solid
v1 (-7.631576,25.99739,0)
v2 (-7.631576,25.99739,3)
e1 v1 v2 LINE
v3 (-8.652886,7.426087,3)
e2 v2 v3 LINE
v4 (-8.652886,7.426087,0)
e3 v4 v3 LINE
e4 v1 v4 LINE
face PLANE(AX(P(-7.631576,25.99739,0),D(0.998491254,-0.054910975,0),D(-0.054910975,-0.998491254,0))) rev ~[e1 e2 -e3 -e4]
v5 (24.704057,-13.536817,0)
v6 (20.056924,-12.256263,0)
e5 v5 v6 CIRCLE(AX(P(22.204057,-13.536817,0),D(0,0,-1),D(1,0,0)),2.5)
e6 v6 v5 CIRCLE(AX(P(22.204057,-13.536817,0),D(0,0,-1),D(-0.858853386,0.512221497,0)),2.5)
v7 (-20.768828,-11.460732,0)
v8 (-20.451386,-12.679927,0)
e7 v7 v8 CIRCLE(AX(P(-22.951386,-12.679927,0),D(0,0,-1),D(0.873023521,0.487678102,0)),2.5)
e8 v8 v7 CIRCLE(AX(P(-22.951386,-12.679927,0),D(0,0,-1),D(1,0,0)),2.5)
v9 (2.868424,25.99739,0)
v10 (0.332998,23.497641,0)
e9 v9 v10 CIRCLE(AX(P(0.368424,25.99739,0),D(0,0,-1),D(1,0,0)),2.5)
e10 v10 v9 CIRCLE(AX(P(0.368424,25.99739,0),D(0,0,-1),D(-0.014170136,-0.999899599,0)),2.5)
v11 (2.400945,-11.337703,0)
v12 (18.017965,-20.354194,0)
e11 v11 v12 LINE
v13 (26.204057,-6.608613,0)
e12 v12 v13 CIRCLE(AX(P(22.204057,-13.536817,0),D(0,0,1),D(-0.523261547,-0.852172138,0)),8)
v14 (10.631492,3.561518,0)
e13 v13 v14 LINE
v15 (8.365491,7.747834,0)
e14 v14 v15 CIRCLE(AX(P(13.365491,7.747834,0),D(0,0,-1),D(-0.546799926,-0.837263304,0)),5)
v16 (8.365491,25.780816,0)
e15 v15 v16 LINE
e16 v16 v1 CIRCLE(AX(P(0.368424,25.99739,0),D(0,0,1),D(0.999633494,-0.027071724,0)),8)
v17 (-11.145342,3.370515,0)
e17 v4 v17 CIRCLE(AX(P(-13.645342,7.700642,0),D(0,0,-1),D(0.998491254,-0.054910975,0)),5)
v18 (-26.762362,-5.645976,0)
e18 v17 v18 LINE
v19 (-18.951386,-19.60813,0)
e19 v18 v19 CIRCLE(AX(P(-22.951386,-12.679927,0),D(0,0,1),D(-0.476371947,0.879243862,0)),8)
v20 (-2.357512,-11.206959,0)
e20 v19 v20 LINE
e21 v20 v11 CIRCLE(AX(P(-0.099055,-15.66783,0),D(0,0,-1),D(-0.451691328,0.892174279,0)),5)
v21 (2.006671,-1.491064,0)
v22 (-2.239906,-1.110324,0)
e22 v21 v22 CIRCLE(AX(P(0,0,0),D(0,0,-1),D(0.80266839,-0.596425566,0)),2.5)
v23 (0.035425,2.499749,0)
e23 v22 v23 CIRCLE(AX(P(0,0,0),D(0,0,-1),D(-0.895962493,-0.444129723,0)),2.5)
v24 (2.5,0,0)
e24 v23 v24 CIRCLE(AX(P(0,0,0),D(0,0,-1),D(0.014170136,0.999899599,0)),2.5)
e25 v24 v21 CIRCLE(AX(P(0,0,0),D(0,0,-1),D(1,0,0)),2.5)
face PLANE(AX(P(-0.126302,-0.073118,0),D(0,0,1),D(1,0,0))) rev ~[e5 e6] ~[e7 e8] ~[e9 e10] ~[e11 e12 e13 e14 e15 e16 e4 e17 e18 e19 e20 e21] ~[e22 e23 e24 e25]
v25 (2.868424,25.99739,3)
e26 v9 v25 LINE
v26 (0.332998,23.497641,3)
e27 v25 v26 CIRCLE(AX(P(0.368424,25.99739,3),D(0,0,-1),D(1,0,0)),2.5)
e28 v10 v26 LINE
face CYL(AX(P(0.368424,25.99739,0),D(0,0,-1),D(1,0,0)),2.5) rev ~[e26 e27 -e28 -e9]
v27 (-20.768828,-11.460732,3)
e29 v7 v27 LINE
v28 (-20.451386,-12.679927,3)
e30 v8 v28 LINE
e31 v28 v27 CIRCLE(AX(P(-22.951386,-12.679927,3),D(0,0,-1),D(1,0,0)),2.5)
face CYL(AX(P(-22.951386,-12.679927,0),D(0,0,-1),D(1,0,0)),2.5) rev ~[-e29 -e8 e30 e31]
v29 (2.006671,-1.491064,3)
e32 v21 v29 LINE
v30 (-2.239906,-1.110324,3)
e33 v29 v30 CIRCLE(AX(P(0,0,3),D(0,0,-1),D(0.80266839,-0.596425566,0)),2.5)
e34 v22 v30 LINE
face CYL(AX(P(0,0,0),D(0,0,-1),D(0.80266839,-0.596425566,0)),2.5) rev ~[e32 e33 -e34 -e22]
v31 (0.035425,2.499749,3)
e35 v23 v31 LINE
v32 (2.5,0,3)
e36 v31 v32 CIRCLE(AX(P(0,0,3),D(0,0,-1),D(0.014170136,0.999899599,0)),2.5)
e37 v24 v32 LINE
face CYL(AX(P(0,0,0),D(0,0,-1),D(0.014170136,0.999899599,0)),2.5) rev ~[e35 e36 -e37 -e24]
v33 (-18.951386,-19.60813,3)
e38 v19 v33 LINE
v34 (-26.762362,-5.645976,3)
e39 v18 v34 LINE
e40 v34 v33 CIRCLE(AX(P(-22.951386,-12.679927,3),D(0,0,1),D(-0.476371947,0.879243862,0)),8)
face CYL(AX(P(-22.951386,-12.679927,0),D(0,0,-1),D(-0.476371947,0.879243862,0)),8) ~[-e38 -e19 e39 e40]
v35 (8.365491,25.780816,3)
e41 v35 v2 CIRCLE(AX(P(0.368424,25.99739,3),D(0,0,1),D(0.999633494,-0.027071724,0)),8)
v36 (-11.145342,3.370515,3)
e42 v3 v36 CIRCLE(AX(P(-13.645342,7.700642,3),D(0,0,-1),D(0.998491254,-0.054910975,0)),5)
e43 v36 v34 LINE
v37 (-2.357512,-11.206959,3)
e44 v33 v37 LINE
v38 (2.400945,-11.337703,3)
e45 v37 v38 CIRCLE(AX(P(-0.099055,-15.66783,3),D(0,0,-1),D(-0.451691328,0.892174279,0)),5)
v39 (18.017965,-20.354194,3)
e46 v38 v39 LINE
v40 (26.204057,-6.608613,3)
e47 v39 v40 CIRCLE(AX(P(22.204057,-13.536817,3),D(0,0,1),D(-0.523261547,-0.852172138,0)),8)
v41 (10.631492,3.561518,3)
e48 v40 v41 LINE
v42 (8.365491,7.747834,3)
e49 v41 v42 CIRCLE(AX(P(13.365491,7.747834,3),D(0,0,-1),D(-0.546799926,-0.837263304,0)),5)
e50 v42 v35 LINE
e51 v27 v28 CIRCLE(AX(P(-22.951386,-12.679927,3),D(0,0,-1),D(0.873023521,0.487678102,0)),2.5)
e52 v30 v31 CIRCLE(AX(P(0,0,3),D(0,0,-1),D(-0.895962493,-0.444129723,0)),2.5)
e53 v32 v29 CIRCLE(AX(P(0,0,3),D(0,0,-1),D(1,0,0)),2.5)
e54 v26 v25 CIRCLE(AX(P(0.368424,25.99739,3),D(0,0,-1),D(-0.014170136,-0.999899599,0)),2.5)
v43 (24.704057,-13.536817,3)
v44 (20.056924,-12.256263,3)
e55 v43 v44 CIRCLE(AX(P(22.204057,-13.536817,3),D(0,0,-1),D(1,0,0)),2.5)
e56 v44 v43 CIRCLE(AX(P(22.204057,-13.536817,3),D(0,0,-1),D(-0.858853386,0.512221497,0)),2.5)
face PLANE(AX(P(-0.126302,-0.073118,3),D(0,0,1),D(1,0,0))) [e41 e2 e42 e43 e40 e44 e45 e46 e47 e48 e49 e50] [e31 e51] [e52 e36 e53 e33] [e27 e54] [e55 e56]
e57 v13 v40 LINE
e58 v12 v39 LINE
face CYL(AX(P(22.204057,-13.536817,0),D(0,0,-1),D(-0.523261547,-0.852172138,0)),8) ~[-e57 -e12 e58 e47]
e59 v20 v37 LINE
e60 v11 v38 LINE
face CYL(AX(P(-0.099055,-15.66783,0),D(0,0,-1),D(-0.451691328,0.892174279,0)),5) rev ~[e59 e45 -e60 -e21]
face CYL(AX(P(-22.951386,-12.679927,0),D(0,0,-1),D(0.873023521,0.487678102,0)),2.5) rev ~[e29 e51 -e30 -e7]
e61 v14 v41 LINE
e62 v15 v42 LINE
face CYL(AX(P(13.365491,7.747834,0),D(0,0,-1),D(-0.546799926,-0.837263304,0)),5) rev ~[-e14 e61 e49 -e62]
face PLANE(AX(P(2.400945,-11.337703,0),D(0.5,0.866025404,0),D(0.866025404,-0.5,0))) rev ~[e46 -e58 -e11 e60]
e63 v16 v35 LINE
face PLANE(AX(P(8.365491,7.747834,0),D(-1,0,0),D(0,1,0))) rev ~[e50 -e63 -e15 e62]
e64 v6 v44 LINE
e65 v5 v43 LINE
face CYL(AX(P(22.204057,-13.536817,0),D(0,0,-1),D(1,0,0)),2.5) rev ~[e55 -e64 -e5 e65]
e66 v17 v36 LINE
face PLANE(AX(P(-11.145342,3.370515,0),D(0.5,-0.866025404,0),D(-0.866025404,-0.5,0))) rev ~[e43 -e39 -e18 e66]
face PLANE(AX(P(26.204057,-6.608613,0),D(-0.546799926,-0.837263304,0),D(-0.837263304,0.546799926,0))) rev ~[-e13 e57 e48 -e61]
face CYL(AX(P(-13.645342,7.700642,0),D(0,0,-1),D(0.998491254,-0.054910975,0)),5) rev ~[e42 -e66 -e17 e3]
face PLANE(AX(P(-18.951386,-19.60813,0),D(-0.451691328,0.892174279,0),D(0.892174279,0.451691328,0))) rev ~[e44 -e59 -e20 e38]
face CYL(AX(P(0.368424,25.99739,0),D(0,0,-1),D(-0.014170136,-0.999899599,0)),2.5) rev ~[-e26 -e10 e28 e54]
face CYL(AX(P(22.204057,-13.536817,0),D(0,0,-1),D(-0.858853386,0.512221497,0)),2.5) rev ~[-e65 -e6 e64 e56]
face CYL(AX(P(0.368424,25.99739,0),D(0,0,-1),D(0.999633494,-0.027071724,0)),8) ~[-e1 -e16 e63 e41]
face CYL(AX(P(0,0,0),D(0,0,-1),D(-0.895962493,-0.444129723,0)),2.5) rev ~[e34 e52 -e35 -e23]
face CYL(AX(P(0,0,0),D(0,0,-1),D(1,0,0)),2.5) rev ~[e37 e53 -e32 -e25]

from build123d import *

# Parameters (mm, degrees)
F1_DEPTH = 3


# Not quite as in the source:
# - a feature names something its author has since deleted; it is built from what else it names


with BuildPart() as f1:
    # F0 (on Top) → F1 (new body)
    with BuildSketch(Plane.XY):
        with BuildLine():
            Line((8.3654914828, 7.7478343503), (8.3654914828, 25.7808157751))
            ThreePointArc((8.3654914828, 25.7808157751), (0.4767203504, 33.9966565171), (-7.631576467, 25.9973895632))
            Line((-7.631576467, 25.9973895632), (-8.6528857034, 7.4260866897))
            ThreePointArc((-8.6528857034, 7.4260866897), (-9.3855131516, 5.0826540918), (-11.1453419747, 3.3705145438))
            Line((-11.1453419747, 3.3705145438), (-26.7623619946, -5.6459761686))
            ThreePointArc((-26.7623619946, -5.6459761686), (-29.9331032244, -16.585772745), (-18.951386422, -19.6081302933))
            Line((-18.951386422, -19.6081302933), (-2.3575117339, -11.2069586004))
            ThreePointArc((-2.3575117339, -11.2069586004), (0.038274152, -10.6697162831), (2.400944907, -11.3377029763))
            Line((2.400944907, -11.3377029763), (18.0179649268, -20.3541936886))
            ThreePointArc((18.0179649268, -20.3541936886), (29.0774772891, -17.6302378543), (26.204057304, -6.6086133521))
            Line((26.204057304, -6.6086133521), (10.6314918524, 3.5615178285))
            ThreePointArc((10.6314918524, 3.5615178285), (8.9683334147, 5.3677081091), (8.3654914828, 7.7478343503))
        make_face()
        with BuildLine():
            ThreePointArc((-20.451386422, -12.679927063), (-25.3707248656, -13.3098488797), (-20.7688276181, -11.4607318089))
            ThreePointArc((-20.7688276181, -11.4607318089), (-20.5320479783, -12.0500052463), (-20.451386422, -12.679927063))
        make_face(mode=Mode.SUBTRACT)
        with BuildLine():
            ThreePointArc((24.704057304, -13.5368165824), (21.5399163779, -15.9469860432), (20.0569238399, -12.25626284))
            ThreePointArc((20.0569238399, -12.25626284), (22.8681982302, -11.1266471215), (24.704057304, -13.5368165824))
        make_face(mode=Mode.SUBTRACT)
        with BuildLine():
            ThreePointArc((-7.9164689421, -4.2812988086), (-7.6979940139, 4.6627125327), (0.127531223, 8.9990963873))
            ThreePointArc((0.127531223, 8.9990963873), (6.4088915191, 6.3187110629), (9, 0))
            ThreePointArc((9, 0), (8.6421794957, -2.5125153857), (7.5971703192, -4.8252464332))
            ThreePointArc((7.5971703192, -4.8252464332), (-0.315369081, -8.9944728774), (-7.9164689421, -4.2812988086))
        make_face(mode=Mode.SUBTRACT)
        with BuildLine():
            ThreePointArc((2.868423533, 25.9973895632), (2.1236210505, 24.217141919), (0.3329981933, 23.4976405667))
            ThreePointArc((0.3329981933, 23.4976405667), (-1.3867739845, 27.7776372074), (2.868423533, 25.9973895632))
        make_face(mode=Mode.SUBTRACT)
        with BuildLine():
            ThreePointArc((0.0354253397, 2.4997489965), (1.7802476442, 1.7551975175), (2.5, 0))
            ThreePointArc((2.5, 0), (2.3734655501, -0.7852778377), (2.0066709741, -1.4910639161))
            Line((2.0066709741, -1.4910639161), (7.5971703192, -4.8252464332))
            ThreePointArc((7.5971703192, -4.8252464332), (8.6421794957, -2.5125153857), (9, 0))
            ThreePointArc((9, 0), (6.4088915191, 6.3187110629), (0.127531223, 8.9990963873))
            Line((0.127531223, 8.9990963873), (0.0354253397, 2.4997489965))
        make_face()
        with BuildLine():
            ThreePointArc((-2.239906233, -1.1103243073), (-2.1149683962, 1.333007383), (0.0354253397, 2.4997489965))
            Line((0.0354253397, 2.4997489965), (0.127531223, 8.9990963873))
            ThreePointArc((0.127531223, 8.9990963873), (-7.6979940139, 4.6627125327), (-7.9164689421, -4.2812988086))
            Line((-7.9164689421, -4.2812988086), (-2.239906233, -1.1103243073))
        make_face()
        with BuildLine():
            Line((7.5971703192, -4.8252464332), (2.0066709741, -1.4910639161))
            ThreePointArc((2.0066709741, -1.4910639161), (-0.2232494881, -2.4900119811), (-2.239906233, -1.1103243073))
            Line((-2.239906233, -1.1103243073), (-7.9164689421, -4.2812988086))
            ThreePointArc((-7.9164689421, -4.2812988086), (-0.315369081, -8.9944728774), (7.5971703192, -4.8252464332))
        make_face()
    extrude(amount=F1_DEPTH)


solid = f1.part
